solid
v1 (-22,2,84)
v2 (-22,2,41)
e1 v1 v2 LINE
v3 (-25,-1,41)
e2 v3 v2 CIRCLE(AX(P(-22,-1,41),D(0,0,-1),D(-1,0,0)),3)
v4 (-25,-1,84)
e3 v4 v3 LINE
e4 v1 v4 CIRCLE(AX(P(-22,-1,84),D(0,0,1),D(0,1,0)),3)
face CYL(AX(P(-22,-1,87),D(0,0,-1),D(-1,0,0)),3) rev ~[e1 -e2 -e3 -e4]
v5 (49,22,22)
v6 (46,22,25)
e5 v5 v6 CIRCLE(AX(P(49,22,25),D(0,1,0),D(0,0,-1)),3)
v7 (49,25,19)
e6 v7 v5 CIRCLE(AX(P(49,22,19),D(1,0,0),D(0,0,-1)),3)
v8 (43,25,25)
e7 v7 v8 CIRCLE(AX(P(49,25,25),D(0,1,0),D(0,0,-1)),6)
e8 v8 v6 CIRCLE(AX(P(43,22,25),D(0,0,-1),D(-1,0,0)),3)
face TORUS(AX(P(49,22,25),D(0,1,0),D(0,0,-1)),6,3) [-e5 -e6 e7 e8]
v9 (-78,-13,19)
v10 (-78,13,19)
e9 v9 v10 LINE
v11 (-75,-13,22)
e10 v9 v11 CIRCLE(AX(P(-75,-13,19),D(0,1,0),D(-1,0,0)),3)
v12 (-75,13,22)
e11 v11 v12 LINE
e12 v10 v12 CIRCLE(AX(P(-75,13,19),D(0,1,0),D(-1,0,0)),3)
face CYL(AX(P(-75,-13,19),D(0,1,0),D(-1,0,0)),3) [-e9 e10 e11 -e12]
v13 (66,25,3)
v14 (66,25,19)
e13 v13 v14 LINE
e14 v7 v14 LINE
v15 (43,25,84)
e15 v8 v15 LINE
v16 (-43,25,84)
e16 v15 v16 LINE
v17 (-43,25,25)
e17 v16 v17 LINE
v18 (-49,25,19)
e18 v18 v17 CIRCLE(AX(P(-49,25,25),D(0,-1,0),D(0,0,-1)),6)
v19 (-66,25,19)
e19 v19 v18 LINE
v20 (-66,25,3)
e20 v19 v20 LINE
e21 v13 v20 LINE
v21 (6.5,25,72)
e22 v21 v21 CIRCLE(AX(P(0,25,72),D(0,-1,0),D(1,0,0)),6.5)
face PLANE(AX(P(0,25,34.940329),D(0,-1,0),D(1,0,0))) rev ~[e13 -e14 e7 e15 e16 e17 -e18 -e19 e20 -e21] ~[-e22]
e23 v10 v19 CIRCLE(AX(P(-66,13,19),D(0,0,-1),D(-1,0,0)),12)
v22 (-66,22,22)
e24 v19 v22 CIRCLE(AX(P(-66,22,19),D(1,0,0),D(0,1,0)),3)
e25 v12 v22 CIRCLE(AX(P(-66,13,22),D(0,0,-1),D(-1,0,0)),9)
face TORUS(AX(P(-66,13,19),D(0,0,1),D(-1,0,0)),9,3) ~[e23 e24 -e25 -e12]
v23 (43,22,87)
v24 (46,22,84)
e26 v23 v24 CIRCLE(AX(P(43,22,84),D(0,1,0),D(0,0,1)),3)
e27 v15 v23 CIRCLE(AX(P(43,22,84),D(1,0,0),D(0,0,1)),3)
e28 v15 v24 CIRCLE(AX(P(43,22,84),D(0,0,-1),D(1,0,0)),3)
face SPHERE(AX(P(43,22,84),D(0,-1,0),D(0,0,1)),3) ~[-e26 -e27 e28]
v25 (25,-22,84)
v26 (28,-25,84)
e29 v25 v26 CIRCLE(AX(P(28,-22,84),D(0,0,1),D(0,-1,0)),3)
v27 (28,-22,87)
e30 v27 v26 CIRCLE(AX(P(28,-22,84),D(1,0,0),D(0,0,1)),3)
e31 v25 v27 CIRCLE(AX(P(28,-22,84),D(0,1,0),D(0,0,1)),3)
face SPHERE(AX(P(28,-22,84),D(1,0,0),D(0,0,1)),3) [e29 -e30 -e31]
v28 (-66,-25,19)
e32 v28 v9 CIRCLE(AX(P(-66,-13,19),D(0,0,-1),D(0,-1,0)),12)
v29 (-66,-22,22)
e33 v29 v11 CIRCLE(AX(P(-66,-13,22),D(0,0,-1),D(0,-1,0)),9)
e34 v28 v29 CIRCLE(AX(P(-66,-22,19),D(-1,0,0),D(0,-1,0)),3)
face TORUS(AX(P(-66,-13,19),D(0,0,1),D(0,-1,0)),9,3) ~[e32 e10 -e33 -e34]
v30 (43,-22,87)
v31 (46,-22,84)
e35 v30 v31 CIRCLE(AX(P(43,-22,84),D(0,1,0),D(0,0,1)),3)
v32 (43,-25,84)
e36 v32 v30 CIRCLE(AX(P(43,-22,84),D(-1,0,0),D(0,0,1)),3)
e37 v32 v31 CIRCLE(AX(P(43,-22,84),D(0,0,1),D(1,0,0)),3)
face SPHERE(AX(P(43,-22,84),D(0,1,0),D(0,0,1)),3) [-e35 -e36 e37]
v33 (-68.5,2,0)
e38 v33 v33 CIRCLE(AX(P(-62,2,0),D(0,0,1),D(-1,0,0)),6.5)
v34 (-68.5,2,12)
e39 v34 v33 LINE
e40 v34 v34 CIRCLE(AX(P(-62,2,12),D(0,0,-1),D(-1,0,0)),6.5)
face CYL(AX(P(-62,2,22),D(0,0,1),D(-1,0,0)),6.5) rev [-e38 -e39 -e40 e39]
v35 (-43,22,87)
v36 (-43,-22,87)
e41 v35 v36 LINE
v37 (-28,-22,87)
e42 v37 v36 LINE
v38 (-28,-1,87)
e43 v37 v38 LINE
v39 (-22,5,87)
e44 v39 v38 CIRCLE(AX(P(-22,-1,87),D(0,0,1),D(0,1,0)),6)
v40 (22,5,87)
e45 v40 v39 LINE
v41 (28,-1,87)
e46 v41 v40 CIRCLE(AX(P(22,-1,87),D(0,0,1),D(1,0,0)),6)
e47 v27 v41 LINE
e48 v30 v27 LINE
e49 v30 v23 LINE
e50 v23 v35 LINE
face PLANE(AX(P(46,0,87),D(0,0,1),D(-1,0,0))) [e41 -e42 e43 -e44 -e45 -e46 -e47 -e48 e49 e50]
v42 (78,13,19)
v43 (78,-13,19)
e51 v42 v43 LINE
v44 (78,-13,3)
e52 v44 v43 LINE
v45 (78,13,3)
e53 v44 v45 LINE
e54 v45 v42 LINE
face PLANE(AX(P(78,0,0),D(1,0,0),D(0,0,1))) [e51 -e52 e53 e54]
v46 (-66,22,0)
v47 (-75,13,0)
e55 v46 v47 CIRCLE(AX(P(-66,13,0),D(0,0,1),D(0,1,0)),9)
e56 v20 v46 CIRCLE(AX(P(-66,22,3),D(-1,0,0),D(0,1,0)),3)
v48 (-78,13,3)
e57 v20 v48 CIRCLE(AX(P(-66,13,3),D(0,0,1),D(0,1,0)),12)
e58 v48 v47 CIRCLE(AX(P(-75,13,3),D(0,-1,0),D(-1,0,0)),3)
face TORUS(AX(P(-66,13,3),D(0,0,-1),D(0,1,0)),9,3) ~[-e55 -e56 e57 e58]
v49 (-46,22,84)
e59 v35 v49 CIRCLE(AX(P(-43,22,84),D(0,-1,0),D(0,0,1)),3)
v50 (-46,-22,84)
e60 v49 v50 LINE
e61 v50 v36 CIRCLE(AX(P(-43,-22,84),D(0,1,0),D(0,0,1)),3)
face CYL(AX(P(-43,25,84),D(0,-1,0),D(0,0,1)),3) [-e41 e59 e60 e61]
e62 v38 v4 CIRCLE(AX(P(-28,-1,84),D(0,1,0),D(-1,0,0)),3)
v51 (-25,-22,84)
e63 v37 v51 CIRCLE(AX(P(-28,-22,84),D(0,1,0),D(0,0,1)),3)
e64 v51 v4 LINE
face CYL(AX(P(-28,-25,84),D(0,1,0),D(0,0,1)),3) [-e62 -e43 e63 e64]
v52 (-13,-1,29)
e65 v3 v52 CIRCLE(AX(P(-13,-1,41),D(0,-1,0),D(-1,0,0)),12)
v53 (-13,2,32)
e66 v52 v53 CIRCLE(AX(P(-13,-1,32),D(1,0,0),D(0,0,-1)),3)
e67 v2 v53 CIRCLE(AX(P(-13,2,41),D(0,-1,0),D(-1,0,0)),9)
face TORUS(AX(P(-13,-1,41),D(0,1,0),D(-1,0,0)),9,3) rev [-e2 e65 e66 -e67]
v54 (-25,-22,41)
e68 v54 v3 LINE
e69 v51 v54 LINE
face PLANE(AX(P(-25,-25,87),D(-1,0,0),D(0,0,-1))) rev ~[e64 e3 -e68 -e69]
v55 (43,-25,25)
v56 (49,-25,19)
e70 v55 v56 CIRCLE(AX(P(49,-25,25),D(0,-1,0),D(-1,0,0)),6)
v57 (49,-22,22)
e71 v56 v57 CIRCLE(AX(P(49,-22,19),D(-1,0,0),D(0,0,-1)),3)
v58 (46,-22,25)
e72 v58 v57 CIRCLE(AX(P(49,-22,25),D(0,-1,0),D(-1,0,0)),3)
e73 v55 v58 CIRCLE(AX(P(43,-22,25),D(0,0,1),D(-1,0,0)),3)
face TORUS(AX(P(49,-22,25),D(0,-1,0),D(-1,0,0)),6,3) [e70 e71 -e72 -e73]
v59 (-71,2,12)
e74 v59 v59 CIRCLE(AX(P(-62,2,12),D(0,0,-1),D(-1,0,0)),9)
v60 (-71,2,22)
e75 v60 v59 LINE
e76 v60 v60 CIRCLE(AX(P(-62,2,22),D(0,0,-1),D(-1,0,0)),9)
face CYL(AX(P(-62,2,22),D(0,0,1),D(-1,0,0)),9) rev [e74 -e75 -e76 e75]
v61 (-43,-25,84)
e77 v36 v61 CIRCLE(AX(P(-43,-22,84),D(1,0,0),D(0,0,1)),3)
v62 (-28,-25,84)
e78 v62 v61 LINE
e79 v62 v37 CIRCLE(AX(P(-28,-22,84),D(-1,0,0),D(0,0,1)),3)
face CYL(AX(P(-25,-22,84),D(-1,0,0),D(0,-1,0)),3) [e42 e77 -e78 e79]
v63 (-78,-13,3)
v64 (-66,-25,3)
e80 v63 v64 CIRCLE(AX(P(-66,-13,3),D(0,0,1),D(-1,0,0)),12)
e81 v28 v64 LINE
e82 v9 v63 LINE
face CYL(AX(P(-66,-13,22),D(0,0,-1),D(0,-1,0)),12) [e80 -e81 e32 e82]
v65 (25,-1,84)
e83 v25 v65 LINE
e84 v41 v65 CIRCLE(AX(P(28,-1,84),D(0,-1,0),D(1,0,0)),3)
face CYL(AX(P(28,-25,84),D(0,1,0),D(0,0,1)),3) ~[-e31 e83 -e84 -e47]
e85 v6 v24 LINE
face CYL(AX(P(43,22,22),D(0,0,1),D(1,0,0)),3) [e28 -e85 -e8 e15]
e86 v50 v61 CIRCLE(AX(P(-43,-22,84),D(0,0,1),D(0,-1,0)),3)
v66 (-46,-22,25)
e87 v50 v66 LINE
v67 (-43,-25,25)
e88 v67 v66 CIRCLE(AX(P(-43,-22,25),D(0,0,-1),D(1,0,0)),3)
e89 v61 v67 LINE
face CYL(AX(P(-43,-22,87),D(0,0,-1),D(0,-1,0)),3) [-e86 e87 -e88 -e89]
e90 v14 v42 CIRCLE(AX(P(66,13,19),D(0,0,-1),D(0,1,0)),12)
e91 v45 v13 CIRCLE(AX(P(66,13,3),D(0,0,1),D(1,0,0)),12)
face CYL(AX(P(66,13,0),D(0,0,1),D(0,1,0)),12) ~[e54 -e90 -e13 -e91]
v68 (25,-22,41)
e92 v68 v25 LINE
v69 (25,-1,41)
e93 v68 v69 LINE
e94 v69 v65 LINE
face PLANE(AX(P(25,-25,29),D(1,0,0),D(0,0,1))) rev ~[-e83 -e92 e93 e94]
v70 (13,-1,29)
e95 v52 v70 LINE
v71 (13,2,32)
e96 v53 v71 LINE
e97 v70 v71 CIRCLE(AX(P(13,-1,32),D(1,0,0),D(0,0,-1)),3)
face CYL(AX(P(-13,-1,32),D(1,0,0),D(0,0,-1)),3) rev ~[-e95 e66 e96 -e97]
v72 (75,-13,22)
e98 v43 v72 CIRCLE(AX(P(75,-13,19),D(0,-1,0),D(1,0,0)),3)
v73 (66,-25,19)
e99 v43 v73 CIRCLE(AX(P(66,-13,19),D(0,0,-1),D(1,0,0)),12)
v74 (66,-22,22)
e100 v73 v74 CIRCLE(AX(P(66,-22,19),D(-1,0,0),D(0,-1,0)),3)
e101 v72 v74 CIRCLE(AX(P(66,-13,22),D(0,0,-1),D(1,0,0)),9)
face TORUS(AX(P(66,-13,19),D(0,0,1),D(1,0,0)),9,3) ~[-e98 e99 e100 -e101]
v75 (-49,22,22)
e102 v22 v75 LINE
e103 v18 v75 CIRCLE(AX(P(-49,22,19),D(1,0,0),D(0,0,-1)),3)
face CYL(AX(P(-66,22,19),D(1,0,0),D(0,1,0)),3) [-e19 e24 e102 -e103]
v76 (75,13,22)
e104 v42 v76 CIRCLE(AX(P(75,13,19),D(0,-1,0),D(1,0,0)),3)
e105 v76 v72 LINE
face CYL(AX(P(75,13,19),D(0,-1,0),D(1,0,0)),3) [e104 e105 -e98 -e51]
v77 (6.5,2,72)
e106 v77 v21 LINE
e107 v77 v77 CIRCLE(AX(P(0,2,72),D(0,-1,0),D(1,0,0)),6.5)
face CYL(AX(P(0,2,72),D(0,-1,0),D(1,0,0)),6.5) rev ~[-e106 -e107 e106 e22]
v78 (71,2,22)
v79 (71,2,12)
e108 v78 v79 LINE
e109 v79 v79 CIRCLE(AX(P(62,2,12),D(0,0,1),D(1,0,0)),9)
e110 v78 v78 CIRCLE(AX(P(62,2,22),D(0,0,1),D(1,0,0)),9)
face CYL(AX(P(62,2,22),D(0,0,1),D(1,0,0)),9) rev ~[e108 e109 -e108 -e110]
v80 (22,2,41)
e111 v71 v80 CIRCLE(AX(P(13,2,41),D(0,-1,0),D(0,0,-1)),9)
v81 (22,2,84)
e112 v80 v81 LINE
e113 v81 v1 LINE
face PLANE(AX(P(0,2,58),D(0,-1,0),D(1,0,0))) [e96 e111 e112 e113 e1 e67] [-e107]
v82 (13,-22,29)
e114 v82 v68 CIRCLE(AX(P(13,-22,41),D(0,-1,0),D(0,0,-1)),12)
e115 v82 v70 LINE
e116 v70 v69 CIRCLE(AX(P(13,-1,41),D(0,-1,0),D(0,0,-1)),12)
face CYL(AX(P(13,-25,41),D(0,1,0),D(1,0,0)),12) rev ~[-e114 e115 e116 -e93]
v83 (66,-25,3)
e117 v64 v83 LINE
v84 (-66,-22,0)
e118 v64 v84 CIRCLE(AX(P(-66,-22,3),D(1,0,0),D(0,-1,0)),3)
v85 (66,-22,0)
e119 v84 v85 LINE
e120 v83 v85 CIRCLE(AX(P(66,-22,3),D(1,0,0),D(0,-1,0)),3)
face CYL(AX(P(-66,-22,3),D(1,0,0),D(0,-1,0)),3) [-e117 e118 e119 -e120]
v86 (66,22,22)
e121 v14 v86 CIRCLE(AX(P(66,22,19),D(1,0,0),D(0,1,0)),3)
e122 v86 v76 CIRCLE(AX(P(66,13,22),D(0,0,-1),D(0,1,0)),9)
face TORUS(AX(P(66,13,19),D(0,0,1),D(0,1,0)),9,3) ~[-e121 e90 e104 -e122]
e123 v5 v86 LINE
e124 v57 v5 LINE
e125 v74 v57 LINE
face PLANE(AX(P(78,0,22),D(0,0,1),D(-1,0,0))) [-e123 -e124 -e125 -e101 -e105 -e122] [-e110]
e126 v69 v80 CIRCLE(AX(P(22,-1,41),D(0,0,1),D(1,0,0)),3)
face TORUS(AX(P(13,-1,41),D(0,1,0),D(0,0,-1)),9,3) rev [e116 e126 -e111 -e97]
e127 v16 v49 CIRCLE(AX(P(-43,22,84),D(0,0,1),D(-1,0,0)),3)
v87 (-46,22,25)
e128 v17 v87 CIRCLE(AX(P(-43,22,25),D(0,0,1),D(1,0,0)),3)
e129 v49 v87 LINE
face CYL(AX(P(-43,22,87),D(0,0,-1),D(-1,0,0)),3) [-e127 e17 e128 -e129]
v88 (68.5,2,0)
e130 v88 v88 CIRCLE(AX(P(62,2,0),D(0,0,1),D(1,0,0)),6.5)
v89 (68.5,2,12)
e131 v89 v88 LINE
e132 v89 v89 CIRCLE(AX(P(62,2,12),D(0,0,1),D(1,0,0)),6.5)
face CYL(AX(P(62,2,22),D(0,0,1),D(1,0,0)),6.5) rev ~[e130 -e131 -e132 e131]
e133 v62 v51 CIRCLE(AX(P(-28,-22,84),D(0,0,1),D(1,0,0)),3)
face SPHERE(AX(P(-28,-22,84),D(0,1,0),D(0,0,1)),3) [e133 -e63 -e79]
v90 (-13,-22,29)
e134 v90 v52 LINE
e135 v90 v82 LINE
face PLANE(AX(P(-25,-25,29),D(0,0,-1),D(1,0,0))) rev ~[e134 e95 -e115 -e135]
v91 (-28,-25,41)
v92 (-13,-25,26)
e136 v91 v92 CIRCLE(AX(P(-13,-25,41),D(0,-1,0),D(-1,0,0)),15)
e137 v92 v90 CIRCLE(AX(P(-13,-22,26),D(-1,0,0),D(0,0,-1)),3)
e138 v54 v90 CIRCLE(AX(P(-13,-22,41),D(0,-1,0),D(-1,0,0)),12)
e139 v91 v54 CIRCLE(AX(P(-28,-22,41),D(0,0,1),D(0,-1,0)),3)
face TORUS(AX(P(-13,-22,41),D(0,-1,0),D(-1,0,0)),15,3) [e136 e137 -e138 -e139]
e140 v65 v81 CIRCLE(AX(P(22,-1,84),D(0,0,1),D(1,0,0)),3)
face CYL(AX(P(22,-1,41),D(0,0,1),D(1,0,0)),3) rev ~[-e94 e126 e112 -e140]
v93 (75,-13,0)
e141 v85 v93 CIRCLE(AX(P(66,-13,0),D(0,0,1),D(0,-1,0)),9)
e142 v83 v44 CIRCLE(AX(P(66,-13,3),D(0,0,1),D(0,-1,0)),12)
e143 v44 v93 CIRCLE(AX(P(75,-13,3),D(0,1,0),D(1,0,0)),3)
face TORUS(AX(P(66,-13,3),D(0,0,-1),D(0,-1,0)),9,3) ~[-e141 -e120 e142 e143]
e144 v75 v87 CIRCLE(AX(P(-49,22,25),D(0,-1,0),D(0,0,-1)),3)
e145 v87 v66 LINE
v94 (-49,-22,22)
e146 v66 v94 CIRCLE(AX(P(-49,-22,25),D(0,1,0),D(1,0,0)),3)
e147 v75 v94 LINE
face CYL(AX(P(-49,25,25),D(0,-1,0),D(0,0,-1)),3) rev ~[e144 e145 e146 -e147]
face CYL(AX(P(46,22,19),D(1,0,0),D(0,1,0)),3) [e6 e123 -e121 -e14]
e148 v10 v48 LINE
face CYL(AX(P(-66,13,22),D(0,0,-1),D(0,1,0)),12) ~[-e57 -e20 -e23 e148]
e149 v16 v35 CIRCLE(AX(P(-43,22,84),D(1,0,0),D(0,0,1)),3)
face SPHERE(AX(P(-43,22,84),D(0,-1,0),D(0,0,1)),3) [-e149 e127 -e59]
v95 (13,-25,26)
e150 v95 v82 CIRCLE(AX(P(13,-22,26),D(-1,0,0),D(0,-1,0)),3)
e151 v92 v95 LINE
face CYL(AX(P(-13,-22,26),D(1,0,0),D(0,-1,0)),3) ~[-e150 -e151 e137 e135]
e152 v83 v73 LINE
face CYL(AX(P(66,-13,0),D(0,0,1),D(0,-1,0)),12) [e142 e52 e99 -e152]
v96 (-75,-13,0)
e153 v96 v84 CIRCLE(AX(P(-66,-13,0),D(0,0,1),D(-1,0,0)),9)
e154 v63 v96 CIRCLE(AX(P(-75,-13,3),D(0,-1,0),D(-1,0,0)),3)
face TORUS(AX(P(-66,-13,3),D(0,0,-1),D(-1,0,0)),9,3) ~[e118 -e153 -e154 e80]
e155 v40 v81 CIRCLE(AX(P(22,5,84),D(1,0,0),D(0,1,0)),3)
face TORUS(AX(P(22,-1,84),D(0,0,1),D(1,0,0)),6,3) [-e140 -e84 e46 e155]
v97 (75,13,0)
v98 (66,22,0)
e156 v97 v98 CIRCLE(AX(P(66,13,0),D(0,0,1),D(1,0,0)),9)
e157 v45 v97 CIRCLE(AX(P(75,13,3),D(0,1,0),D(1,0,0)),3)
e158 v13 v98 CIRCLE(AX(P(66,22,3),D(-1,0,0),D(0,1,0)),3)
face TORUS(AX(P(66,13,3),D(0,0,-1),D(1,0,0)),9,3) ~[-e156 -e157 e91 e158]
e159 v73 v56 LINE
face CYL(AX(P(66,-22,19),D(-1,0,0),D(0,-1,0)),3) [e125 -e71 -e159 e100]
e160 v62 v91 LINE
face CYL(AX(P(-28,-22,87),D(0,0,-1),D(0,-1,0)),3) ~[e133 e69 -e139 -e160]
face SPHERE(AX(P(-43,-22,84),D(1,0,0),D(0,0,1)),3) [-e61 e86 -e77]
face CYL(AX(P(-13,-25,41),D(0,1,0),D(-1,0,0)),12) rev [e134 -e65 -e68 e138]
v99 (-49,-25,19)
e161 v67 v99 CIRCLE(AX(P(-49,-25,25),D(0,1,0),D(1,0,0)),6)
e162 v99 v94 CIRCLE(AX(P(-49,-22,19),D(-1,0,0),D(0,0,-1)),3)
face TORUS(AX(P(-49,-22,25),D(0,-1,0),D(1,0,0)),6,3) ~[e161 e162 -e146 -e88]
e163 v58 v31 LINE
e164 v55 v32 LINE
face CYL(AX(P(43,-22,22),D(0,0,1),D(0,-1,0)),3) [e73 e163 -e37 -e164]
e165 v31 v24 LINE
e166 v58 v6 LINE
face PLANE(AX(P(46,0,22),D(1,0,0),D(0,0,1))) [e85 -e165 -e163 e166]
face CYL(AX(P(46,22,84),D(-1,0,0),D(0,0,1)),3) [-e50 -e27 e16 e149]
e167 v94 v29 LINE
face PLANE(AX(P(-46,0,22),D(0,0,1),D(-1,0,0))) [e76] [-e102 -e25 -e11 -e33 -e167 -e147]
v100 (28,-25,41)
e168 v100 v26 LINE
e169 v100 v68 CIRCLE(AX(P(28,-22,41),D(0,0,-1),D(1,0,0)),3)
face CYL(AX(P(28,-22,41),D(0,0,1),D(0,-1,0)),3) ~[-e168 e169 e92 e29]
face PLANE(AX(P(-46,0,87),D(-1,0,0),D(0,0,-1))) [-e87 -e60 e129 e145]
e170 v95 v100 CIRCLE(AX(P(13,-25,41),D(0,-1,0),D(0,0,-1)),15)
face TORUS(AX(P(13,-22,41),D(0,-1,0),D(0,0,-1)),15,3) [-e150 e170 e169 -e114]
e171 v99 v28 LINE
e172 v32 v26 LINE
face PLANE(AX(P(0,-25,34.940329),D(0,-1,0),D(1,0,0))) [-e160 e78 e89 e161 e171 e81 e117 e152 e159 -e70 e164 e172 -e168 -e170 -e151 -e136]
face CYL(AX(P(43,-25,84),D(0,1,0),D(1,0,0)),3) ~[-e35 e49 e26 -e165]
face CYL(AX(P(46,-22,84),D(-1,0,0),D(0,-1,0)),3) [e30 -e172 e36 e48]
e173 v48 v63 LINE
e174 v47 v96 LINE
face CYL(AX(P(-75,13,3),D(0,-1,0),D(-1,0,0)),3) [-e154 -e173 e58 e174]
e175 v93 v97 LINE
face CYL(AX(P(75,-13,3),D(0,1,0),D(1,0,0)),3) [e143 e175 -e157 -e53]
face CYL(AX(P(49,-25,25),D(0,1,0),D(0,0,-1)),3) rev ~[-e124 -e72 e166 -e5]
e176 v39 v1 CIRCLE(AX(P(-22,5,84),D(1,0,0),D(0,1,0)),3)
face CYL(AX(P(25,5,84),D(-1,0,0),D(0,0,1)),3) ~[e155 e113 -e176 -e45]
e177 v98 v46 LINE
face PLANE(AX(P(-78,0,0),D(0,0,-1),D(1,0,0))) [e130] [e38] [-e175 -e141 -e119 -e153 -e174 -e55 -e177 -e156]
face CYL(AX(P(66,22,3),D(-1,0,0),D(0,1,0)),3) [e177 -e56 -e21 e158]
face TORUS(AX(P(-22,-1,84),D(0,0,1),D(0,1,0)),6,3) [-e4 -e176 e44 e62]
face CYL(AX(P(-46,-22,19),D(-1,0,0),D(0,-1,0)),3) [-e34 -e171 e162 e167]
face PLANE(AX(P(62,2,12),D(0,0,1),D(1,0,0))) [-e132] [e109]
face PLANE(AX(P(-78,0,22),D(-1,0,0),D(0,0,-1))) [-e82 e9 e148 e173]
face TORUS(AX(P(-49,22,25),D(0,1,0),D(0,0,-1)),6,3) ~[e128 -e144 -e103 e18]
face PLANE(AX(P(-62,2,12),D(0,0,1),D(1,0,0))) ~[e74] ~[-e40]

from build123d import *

# Parameters (mm, degrees)
F1_DEPTH = 25
F3_DEPTH = 27
F4_R     = 6.5
F5_DEPTH = 25
F6_R     = 6.5
F7_DEPTH = 22.001
F8_R     = 9
F8_R_2   = 6.5
F9_DEPTH = 10
F10_R    = 12
F11_R    = 3


# Not quite as in the source:
# - a pattern or mirror of a feature is missing from the dataset's text; its kind, count and spacing are read off the source's solid


with BuildPart() as f1:
    # F0 (on Front) → F1 (new body, symmetric)
    with BuildSketch(Plane.XZ):
        Polygon((46, 87), (0, 87), (-46, 87), (-46, 22), (-78, 22), (-78, 0), (0, 0), (78, 0), (78, 22), (46, 22), align=None)
    extrude(amount=F1_DEPTH, both=True)

    # F2 (on face) → F3 (cut)
    with BuildSketch(Plane.XZ.offset(25)):
        Polygon((25, 87), (0, 87), (-25, 87), (-25, 29), (0, 29), (25, 29), align=None)
    extrude(amount=-F3_DEPTH, mode=Mode.SUBTRACT)

    # F4 (on face) → F5 (cut)
    with BuildSketch(Plane.XZ.offset(-2)):
        with Locations((0, 72)):
            Circle(F4_R)
    extrude(amount=-F5_DEPTH, mode=Mode.SUBTRACT)

    # F6 (on face) → F7 (cut, through all)
    with BuildSketch(Plane.XY.offset(22)):
        with Locations((62, 2)):
            Circle(F6_R)
    f7 = extrude(amount=-F7_DEPTH, mode=Mode.SUBTRACT)

    # F7_copies: F7 across plane
    add(f7.mirror(Plane(origin=(0, 0, 0), x_dir=(0, 0, -1), z_dir=(-1, 0, 0))), mode=Mode.SUBTRACT)

    # F8 (on face) → F9 (cut)
    with BuildSketch(Plane.XY.offset(22)):
        with Locations((62, 2)):
            Circle(F8_R)
        with Locations((62, 2)):
            Circle(F8_R_2, mode=Mode.SUBTRACT)
    f9 = extrude(amount=-F9_DEPTH, mode=Mode.SUBTRACT)

    # F9_copies: F9 across plane
    add(f9.mirror(Plane(origin=(0, 0, 0), x_dir=(0, 0, -1), z_dir=(-1, 0, 0))), mode=Mode.SUBTRACT)

    # F10
    f10_edges = [f1.edges().sort_by_distance(p)[0] for p in [
        (-25, -11.5, 29),
        (25, -11.5, 29),
        (78, -25, 11),
        (-78, -25, 11),
        (-78, 25, 11),
        (78, 25, 11),
    ]]
    fillet(f10_edges, radius=F10_R)

    # F11
    f11_edges = [f1.edges().sort_by_distance(p)[0] for p in [
        (46, 0, 87),
        (35.5, -25, 87),
        (25, -11.5, 87),
        (0, 2, 87),
        (-25, -11.5, 87),
        (-35.5, -25, 87),
        (-46, 0, 87),
        (0, 25, 87),
        (-25, -25, 64),
        (-21.485281, -25, 32.514719),
        (0, -25, 29),
        (-46, -25, 54.5),
        (21.485281, -25, 32.514719),
        (-56, -25, 22),
        (25, -25, 64),
        (-66, -25, 11),
        (0, -25, 0),
        (46, -25, 54.5),
        (66, -25, 11),
        (56, -25, 22),
        (46, 25, 54.5),
        (46, 0, 22),
        (-46, 25, 54.5),
        (-46, 0, 22),
        (-25, 2, 64),
        (-21.485281, 2, 32.514719),
        (0, 2, 29),
        (21.485281, 2, 32.514719),
        (-56, 25, 22),
        (-74.485281, 21.485281, 22),
        (-78, 0, 22),
        (-74.485281, -21.485281, 22),
        (25, 2, 64),
        (-74.485281, -21.485281, 0),
        (-78, 0, 0),
        (-74.485281, 21.485281, 0),
        (0, 25, 0),
        (74.485281, 21.485281, 0),
        (74.485281, -21.485281, 0),
        (78, 0, 0),
        (74.485281, -21.485281, 22),
        (56, 25, 22),
        (74.485281, 21.485281, 22),
        (78, 0, 22),
    ]]
    fillet(f11_edges, radius=F11_R)


solid = f1.part
